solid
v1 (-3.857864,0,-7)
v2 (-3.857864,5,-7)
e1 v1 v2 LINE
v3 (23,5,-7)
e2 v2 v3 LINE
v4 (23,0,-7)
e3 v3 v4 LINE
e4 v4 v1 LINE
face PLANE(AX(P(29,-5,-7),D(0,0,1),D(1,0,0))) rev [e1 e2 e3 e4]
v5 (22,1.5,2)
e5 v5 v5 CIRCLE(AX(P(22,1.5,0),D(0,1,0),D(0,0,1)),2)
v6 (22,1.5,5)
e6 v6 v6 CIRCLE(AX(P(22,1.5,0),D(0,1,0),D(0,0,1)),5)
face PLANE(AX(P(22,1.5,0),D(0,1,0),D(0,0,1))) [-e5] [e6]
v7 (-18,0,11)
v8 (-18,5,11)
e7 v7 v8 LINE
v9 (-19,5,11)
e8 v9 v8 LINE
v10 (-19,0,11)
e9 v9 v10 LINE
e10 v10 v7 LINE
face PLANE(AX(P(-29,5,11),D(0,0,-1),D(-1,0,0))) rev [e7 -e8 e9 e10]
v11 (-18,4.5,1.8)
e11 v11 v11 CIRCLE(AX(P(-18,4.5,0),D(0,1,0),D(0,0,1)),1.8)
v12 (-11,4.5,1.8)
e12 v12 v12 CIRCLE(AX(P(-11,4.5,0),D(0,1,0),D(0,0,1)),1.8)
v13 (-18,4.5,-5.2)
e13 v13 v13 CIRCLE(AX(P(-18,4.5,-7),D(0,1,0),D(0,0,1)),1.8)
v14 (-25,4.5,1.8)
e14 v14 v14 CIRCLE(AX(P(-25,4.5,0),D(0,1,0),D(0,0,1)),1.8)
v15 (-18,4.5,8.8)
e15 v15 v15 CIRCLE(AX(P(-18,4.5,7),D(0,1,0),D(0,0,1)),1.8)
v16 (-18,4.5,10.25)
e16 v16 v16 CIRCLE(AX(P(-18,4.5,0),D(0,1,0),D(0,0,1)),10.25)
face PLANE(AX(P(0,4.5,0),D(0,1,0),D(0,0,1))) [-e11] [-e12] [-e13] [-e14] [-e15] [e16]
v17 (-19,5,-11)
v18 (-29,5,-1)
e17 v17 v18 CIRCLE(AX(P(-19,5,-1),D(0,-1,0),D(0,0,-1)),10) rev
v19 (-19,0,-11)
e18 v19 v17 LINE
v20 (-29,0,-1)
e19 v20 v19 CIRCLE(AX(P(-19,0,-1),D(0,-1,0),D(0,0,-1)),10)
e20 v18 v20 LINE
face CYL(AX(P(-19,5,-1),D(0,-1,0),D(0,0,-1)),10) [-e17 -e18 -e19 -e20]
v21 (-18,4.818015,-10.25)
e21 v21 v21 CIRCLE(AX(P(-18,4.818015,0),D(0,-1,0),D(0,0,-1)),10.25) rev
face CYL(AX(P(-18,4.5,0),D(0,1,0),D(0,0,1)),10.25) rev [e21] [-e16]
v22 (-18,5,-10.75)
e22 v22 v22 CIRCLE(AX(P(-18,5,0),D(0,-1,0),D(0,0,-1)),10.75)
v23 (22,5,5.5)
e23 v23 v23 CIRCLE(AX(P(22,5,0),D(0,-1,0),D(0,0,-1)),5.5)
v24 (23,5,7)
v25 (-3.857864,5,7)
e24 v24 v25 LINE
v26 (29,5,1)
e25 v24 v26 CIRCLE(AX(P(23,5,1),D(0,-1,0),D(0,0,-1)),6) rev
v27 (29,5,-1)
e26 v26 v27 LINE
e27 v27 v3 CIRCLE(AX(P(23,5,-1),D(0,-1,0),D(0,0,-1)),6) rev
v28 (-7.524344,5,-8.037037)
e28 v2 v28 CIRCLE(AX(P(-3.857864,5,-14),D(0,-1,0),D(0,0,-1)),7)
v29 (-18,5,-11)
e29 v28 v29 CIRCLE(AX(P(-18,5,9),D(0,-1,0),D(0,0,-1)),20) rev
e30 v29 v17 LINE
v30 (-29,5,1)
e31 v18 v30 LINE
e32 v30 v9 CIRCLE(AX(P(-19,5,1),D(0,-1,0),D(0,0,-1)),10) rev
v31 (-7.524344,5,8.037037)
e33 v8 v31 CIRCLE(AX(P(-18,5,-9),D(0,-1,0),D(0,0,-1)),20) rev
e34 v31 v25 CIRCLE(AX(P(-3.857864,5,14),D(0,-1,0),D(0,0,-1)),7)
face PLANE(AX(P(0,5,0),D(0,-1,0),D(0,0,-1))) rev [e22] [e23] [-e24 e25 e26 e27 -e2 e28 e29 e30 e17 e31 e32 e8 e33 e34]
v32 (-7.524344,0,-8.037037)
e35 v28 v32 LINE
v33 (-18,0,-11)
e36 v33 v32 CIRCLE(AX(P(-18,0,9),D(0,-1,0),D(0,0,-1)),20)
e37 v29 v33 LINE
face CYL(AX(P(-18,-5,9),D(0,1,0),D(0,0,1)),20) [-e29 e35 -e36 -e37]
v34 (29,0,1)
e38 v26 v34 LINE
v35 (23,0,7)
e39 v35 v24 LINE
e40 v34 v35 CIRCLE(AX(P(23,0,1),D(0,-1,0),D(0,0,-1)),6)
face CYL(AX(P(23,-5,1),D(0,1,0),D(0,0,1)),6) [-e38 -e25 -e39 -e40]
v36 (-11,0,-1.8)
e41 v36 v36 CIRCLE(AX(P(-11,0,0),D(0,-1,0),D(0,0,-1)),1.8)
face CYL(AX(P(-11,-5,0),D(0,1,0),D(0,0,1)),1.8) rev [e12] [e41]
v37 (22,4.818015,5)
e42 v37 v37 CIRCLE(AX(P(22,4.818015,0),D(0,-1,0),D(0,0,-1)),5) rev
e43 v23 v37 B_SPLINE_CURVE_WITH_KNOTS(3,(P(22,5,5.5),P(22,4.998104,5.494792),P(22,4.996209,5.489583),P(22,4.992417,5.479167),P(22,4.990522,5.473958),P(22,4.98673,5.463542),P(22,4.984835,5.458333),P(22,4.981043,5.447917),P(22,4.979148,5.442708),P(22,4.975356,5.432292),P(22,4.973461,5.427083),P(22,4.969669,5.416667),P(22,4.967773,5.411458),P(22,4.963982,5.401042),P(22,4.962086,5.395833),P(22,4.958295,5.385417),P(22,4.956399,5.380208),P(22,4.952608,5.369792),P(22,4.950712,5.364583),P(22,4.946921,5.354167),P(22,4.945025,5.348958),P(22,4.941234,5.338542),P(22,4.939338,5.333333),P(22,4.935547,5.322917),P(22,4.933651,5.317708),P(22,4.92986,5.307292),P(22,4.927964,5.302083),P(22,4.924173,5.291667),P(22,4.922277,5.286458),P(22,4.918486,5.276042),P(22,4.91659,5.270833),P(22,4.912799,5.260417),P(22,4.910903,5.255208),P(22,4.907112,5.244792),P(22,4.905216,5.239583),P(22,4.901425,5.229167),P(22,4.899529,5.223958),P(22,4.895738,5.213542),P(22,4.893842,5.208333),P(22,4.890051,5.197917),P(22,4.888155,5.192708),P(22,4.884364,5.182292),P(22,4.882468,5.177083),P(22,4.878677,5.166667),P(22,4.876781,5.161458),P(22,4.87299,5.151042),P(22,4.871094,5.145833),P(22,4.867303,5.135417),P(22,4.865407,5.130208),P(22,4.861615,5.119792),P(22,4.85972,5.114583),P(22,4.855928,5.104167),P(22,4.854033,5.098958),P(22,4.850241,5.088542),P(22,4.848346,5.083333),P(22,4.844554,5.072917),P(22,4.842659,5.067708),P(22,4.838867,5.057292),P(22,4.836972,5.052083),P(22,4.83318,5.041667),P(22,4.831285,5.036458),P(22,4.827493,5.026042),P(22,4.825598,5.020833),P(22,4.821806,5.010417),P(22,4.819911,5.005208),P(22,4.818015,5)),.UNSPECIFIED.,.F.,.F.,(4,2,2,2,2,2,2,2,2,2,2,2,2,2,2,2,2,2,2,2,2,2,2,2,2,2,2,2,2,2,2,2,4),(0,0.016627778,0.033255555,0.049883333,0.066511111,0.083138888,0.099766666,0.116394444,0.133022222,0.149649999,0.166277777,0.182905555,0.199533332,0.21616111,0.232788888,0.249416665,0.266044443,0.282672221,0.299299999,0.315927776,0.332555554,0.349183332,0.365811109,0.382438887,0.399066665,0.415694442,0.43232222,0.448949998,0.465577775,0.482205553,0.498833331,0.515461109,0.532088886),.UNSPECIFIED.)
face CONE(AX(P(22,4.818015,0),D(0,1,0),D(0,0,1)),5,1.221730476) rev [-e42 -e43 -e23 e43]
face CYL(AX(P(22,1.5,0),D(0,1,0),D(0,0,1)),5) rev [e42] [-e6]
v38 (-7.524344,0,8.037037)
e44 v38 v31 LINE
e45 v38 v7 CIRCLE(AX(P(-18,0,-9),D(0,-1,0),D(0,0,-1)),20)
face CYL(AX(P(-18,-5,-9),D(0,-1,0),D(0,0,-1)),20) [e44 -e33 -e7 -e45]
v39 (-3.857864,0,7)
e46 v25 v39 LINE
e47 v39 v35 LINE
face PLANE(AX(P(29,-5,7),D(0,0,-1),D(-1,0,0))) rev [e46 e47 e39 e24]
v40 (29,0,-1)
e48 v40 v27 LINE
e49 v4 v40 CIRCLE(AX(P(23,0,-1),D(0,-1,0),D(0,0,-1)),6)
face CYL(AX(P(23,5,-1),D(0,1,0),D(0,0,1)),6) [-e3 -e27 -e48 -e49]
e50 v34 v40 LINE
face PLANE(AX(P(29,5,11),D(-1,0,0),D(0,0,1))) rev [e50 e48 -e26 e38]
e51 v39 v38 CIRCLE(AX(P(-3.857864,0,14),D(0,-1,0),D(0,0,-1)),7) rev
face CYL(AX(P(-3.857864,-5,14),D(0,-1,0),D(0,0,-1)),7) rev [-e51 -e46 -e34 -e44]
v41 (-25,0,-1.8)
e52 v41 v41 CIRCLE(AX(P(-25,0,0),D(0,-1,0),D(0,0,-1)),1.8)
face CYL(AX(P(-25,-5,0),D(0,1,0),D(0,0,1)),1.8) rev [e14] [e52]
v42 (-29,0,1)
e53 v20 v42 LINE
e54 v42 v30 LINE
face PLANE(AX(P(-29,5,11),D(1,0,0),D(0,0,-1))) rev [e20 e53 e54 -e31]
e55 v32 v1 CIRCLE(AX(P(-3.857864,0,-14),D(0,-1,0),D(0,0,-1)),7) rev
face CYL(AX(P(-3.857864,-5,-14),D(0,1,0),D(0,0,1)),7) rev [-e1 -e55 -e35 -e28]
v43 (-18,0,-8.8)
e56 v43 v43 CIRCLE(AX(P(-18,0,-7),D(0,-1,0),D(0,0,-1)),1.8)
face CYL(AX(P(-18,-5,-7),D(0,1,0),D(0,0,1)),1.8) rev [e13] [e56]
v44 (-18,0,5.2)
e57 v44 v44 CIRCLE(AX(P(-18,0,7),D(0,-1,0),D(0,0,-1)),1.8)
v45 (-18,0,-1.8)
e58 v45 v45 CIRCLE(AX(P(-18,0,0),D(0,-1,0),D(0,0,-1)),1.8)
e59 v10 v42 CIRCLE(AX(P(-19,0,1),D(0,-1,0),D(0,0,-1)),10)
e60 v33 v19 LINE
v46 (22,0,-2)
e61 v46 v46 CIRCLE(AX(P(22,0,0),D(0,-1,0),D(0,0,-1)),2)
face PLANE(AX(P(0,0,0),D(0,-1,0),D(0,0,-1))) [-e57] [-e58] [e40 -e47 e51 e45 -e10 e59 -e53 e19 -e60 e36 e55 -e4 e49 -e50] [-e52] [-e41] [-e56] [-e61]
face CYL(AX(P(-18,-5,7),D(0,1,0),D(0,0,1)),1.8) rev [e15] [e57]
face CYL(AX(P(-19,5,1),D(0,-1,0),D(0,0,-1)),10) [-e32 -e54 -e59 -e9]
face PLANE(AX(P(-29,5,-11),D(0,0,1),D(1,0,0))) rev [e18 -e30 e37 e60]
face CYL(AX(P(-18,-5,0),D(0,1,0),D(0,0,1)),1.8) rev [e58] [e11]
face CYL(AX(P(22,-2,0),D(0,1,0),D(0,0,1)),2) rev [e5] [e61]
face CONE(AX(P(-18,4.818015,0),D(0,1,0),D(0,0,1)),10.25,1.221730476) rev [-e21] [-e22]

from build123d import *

# Parameters (mm, degrees)
SKETCH_2_W          = 58
SKETCH_2_H          = 22
EXTRUDE_1_DEPTH     = 5
SKETCH_4_R          = 10.25
SKETCH_4_R_2        = 1.8
CUT_EXTRUDE_1_DEPTH = 0.5
SKETCH_4_3_R        = 1.8
CUT_EXTRUDE_2_DEPTH = 10
SKETCH_5_W          = 35
SKETCH_5_H          = 4
CUT_EXTRUDE_3_DEPTH = 10
SKETCH_6_R          = 5
CUT_EXTRUDE_4_DEPTH = 3.5
CHAMFER_1_SIZE      = 0.5
CHAMFER_1_SIZE2     = 0.181985117
SKETCH_7_R          = 2
CUT_EXTRUDE_5_DEPTH = 3.5
FILLET_2_R          = 10
FILLET_3_R          = 6
FILLET_4_R          = 20
FILLET_5_R          = 7


with BuildPart() as part:
    # Эскиз2 → Бобышка-Вытянуть1 (new body)
    with BuildSketch(Plane(origin=(0, 0, 0), x_dir=(1, 0, 0), z_dir=(0, 1, 0))):
        Rectangle(SKETCH_2_W, SKETCH_2_H)
    extrude(amount=EXTRUDE_1_DEPTH)

    # Эскиз4 → Вырез-Вытянуть1 (cut)
    with BuildSketch(Plane(origin=(0, 5, 0), x_dir=(1, 0, 0), z_dir=(0, 1, 0))):
        with Locations(Location((-18, 0, 0), (0, 0, 270))):
            Circle(SKETCH_4_R)
        with Locations(Location((-18, 7, 0), (0, 0, 270))):
            Circle(SKETCH_4_R_2, mode=Mode.SUBTRACT)
        with Locations(Location((-18, -7, 0), (0, 0, 270))):
            Circle(SKETCH_4_R_2, mode=Mode.SUBTRACT)
        with Locations(Location((-25, 0, 0), (0, 0, 270))):
            Circle(SKETCH_4_R_2, mode=Mode.SUBTRACT)
        with Locations(Location((-11, 0, 0), (0, 0, 270))):
            Circle(SKETCH_4_R_2, mode=Mode.SUBTRACT)
        with Locations(Location((-18, 0, 0), (0, 0, 270))):
            Circle(SKETCH_4_R_2, mode=Mode.SUBTRACT)
    extrude(amount=-CUT_EXTRUDE_1_DEPTH, mode=Mode.SUBTRACT)

    # Эскиз4<3> → Вырез-Вытянуть2 (cut)
    with BuildSketch(Plane(origin=(0, 5, 0), x_dir=(1, 0, 0), z_dir=(0, 1, 0))):
        with Locations(Location((-18, 7, 0), (0, 0, 270))):
            Circle(SKETCH_4_3_R)
        with Locations(Location((-11, 0, 0), (0, 0, 270))):
            Circle(SKETCH_4_3_R)
        with Locations(Location((-18, -7, 0), (0, 0, 270))):
            Circle(SKETCH_4_3_R)
        with Locations(Location((-25, 0, 0), (0, 0, 270))):
            Circle(SKETCH_4_3_R)
        with Locations(Location((-18, 0, 0), (0, 0, 270))):
            Circle(SKETCH_4_3_R)
    extrude(amount=-CUT_EXTRUDE_2_DEPTH, mode=Mode.SUBTRACT)

    # Эскиз5 → Вырез-Вытянуть3 (cut)
    with BuildSketch(Plane(origin=(0, 5, 0), x_dir=(1, 0, 0), z_dir=(0, 1, 0))):
        with Locations((11.5, 9)):
            Rectangle(SKETCH_5_W, SKETCH_5_H)
        with Locations((11.5, -9)):
            Rectangle(SKETCH_5_W, SKETCH_5_H)
    extrude(amount=-CUT_EXTRUDE_3_DEPTH, mode=Mode.SUBTRACT)

    # Эскиз6 → Вырез-Вытянуть4 (cut)
    with BuildSketch(Plane(origin=(0, 5, 0), x_dir=(1, 0, 0), z_dir=(0, 1, 0))):
        with Locations(Location((22, 0, 0), (0, 0, 270))):
            Circle(SKETCH_6_R)
    extrude(amount=-CUT_EXTRUDE_4_DEPTH, mode=Mode.SUBTRACT)

    # Фаска1
    chamfer_1_edges = [part.edges().sort_by_distance(p)[0] for p in [
        (22, 5, -5),
        (-18, 5, -10.25),
    ]]
    chamfer_1_side = [part.faces().sort_by_distance(p)[0] for p in [
        (1.690967292, 5, 0),
    ]]
    chamfer(chamfer_1_edges, length=CHAMFER_1_SIZE, length2=CHAMFER_1_SIZE2, reference=chamfer_1_side[0])

    # Эскиз7 → Вырез-Вытянуть5 (cut)
    with BuildSketch(Plane(origin=(0, 1.5, 0), x_dir=(1, 0, 0), z_dir=(0, 1, 0))):
        with Locations(Location((22, 0, 0), (0, 0, 270))):
            Circle(SKETCH_7_R)
    extrude(amount=-CUT_EXTRUDE_5_DEPTH, mode=Mode.SUBTRACT)

    # Скругление2
    fillet_2_edges = [part.edges().sort_by_distance(p)[0] for p in [
        (-29, 2.5, 11),
        (-29, 2.5, -11),
    ]]
    fillet(fillet_2_edges, radius=FILLET_2_R)

    # Скругление3
    fillet_3_edges = [part.edges().sort_by_distance(p)[0] for p in [
        (29, 2.5, -7),
        (29, 2.5, 7),
    ]]
    fillet(fillet_3_edges, radius=FILLET_3_R)

    # Скругление4
    # the kernel refuses this fillet: 20 mm, written as the material it takes off along each edge
    with BuildSketch(Plane(origin=(-6, 35, -11), x_dir=(0, 0, 1), z_dir=(0, -1, 0))) as fillet_4_piece_1:
        with BuildLine():
            CenterArc((20, 12), FILLET_4_R, 180, 36.869897646)
            Line((0, 12), (-0.4, 12))
            Line((-0.4, 12), (-0.4, 0))
            Line((-0.4, 0), (0, -0.4))
            ThreePointArc((0, -0.4), (2, -0.4), (3.68, -0.24))
            Line((3.68, -0.24), (4, 0))
        make_face()
    extrude(amount=65, mode=Mode.SUBTRACT)
    with BuildSketch(Plane(origin=(-6, 35, 11), x_dir=(0, 0, -1), z_dir=(0, -1, 0))) as fillet_4_piece_2:
        with BuildLine():
            CenterArc((20, -12), FILLET_4_R, 143.130102354, 36.869897646)
            Line((0, -12), (-0.4, -12))
            Line((-0.4, -12), (-0.4, 0))
            Line((-0.4, 0), (0, 0.4))
            ThreePointArc((0, 0.4), (2, 0.4), (3.68, 0.24))
            Line((3.68, 0.24), (4, 0))
        make_face()
    extrude(amount=65, mode=Mode.SUBTRACT)

    # Скругление5
    fillet_5_edges = [part.edges().sort_by_distance(p)[0] for p in [
        (-6, 2.5, -7),
        (-6, 2.5, 7),
    ]]
    fillet(fillet_5_edges, radius=FILLET_5_R)


solid = part.part
